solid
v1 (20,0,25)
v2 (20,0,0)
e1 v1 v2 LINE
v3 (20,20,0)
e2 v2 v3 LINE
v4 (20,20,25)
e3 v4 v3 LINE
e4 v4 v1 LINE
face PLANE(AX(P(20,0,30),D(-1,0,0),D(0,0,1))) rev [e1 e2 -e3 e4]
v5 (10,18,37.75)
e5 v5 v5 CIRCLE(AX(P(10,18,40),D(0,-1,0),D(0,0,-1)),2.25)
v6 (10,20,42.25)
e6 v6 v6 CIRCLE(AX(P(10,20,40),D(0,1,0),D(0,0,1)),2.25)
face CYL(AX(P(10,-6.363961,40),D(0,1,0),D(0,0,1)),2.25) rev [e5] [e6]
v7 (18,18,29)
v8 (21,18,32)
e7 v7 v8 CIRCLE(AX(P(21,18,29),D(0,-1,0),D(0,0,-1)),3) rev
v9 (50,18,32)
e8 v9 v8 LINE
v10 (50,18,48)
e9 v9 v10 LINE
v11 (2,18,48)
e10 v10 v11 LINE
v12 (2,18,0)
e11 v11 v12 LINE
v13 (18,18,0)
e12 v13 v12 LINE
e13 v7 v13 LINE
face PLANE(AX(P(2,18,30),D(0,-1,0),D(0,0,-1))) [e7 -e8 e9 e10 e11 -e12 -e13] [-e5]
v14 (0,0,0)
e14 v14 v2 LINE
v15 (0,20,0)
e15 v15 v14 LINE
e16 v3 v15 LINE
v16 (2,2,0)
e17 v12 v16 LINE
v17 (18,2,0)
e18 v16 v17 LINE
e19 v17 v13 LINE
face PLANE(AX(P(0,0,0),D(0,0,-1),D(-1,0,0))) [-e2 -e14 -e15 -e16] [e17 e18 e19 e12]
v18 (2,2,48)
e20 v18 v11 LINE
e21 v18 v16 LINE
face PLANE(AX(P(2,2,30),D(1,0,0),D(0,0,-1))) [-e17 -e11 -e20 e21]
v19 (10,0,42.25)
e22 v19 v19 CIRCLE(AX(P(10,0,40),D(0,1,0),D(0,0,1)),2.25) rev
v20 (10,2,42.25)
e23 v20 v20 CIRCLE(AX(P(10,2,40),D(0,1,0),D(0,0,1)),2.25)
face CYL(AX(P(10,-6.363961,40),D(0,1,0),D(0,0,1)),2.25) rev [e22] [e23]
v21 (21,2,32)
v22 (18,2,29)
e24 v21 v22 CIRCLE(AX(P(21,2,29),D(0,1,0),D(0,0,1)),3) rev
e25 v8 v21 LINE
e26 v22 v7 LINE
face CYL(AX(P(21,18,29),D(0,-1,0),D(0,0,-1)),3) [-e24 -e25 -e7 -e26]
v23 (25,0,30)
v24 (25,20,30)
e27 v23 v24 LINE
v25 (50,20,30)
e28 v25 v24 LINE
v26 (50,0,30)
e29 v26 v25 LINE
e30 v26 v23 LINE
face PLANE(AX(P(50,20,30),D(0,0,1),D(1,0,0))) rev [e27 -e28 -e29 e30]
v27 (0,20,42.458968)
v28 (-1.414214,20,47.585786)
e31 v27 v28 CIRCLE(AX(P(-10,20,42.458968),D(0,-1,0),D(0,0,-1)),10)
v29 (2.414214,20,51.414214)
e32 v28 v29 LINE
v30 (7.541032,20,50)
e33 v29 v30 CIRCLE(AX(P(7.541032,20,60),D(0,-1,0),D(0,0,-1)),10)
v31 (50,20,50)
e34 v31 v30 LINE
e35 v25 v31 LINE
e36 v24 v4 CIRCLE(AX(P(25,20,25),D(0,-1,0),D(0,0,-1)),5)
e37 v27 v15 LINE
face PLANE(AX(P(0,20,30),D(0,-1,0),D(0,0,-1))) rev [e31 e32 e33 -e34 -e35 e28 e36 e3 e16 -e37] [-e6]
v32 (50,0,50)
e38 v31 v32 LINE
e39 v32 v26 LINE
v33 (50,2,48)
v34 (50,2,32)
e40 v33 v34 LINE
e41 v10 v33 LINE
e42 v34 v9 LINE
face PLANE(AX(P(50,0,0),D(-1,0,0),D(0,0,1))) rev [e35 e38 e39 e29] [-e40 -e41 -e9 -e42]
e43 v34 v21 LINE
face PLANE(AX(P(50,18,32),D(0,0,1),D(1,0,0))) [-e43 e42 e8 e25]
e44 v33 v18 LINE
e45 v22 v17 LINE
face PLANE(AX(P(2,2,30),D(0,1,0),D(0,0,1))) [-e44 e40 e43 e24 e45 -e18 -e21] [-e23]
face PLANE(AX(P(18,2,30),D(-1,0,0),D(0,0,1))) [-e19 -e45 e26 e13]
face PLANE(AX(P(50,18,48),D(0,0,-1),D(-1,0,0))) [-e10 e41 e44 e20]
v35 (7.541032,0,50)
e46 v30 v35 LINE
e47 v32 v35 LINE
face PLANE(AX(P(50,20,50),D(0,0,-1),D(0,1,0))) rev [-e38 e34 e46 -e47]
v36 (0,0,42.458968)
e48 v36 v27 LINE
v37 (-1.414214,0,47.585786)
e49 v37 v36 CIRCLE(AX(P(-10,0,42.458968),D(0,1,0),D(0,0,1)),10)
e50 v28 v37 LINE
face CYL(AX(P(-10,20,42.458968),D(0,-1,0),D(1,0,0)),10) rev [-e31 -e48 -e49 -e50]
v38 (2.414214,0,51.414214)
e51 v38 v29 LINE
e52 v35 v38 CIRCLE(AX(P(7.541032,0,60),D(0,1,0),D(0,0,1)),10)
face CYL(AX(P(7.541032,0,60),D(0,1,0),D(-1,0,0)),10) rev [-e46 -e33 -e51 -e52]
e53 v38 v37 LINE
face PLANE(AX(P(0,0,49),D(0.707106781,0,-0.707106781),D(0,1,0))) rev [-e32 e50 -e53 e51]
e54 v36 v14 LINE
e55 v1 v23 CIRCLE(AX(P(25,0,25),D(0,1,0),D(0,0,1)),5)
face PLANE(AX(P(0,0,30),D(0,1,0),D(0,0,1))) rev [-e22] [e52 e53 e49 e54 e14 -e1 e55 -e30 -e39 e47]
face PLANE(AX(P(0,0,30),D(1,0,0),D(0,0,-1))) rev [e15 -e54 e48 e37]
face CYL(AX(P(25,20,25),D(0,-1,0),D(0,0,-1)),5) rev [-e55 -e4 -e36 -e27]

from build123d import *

# Parameters (mm, degrees)
SKETCH1_W                = 20
SKETCH1_H                = 20
SKETCH1_W_2              = 16
SKETCH1_H_2              = 16
BOSS_EXTRUDE1_DEPTH      = 30
BOSS_EXTRUDE2_DEPTH      = 30
BOSS_EXTRUDE2_DEPTH_BACK = 20
SKETCH2_W                = 20
SKETCH2_H                = 20
SKETCH2_W_2              = 16
SKETCH2_H_2              = 16
SKETCH3_W                = 16
SKETCH3_H                = 16
CUT_EXTRUDE1_DEPTH       = 2
SKETCH4_W                = 16
SKETCH4_H                = 16
BOSS_EXTRUDE3_DEPTH      = 2
CHAMFER1_SIZE            = 1
BOSS_EXTRUDE4_REACH      = 83.243
SKETCH5_W                = 2
SKETCH5_H                = 20
BOSS_EXTRUDE6_REACH      = 83.243
SKETCH7_W                = 2
SKETCH7_H                = 20
FILLET1_R                = 10
FILLET2_R                = 3
CUT_EXTRUDE2_REACH       = 76.454
SKETCH8_R                = 2.25
FILLET3_R                = 5


with BuildPart() as part:
    # Sketch1 → Boss-Extrude1 (new body)
    with BuildSketch(Plane.XY):
        with Locations((10, 10)):
            Rectangle(SKETCH1_W, SKETCH1_H)
        with Locations((10, 10)):
            Rectangle(SKETCH1_W_2, SKETCH1_H_2, mode=Mode.SUBTRACT)
    extrude(amount=BOSS_EXTRUDE1_DEPTH)

    # Sketch2 → Boss-Extrude2 (add, two sides: drawn at the far end of the back side and taken through both)
    with BuildSketch(Plane(origin=(20, 0, 0), x_dir=(0, 0, -1), z_dir=(1, 0, 0)).offset(-BOSS_EXTRUDE2_DEPTH_BACK)):
        with Locations((-40, 10)):
            Rectangle(SKETCH2_W, SKETCH2_H)
        with Locations((-40, 10)):
            Rectangle(SKETCH2_W_2, SKETCH2_H_2, mode=Mode.SUBTRACT)
    extrude(amount=BOSS_EXTRUDE2_DEPTH + BOSS_EXTRUDE2_DEPTH_BACK)

    # Sketch3 → Cut-Extrude1 (cut)
    with BuildSketch(Plane(origin=(0, 0, 30), x_dir=(-1, 0, 0), z_dir=(0, 0, -1))):
        with Locations((-10, 10)):
            Rectangle(SKETCH3_W, SKETCH3_H)
    extrude(amount=-CUT_EXTRUDE1_DEPTH, mode=Mode.SUBTRACT)

    # Sketch4 → Boss-Extrude3 (add)
    with BuildSketch(Plane.ZY):
        with Locations((40, 10)):
            Rectangle(SKETCH4_W, SKETCH4_H)
    extrude(amount=-BOSS_EXTRUDE3_DEPTH)

    # Chamfer1
    chamfer1_edges = [part.edges().sort_by_distance(p)[0] for p in [
        (0, 10, 50),
    ]]
    chamfer(chamfer1_edges, length=CHAMFER1_SIZE)

    # Boss-Extrude4: up to this face of the body (flat: up to its plane)
    boss_extrude4_end = Plane(part.part.faces().sort_by_distance((0, 10, 24.5))[0])
    # Sketch5 → Boss-Extrude4 (add, up to the picked face)
    with BuildSketch(Plane(origin=(-24.5, 0, 24.5), x_dir=(0.7071067811865475, 0, 0.7071067811865477), z_dir=(-0.7071067811865477, 0, 0.7071067811865475)), mode=Mode.PRIVATE) as boss_extrude4_sk1:
        with Locations((33.648232278, 10)):
            Rectangle(SKETCH5_W, SKETCH5_H)
    boss_extrude4_tool1 = split(extrude(boss_extrude4_sk1.sketch, amount=-BOSS_EXTRUDE4_REACH, mode=Mode.PRIVATE), bisect_by=boss_extrude4_end, keep=Keep.BOTH, mode=Mode.PRIVATE)
    add(boss_extrude4_tool1.solids().sort_by(Axis((-0.707107, 10, 48.292893), (0.7071067811865477, 0, -0.7071067811865475)))[0])

    # Boss-Extrude6: up to this face of the body (flat: up to its plane)
    boss_extrude6_end = Plane(part.part.faces().sort_by_distance((25.5, 10, 50))[0])
    # Sketch7 → Boss-Extrude6 (add, up to the picked face)
    with BuildSketch(Plane(origin=(-24.5, 0, 24.5), x_dir=(0.7071067811865475, 0, 0.7071067811865477), z_dir=(-0.7071067811865477, 0, 0.7071067811865475)), mode=Mode.PRIVATE) as boss_extrude6_sk1:
        with Locations((37.062445841, 10)):
            Rectangle(SKETCH7_W, SKETCH7_H)
    boss_extrude6_tool1 = split(extrude(boss_extrude6_sk1.sketch, amount=-BOSS_EXTRUDE6_REACH, mode=Mode.PRIVATE), bisect_by=boss_extrude6_end, keep=Keep.BOTH, mode=Mode.PRIVATE)
    add(boss_extrude6_tool1.solids().sort_by(Axis((1.707107, 10, 50.707107), (0.7071067811865477, 0, -0.7071067811865475)))[0])

    # Fillet1
    # the kernel refuses this fillet: 10 mm, written as the material it adds along each edge
    with BuildSketch(Plane(origin=(0, 0, 46.171572875), x_dir=(-0.7071067811878772, 0, 0.7071067811852179), z_dir=(0, 1, 0))) as fillet1_piece_1:
        with BuildLine():
            CenterArc((4.445859456, -9.696276168), FILLET1_R, 104.157365729, 30.842634271)
            Line((-2.625208356, -2.625208356), (-2.766629712, -2.483787))
            Line((-2.766629712, -2.483787), (-0.141421356, 0.141421356))
            Line((-0.141421356, 0.141421356), (0, 0.2))
            ThreePointArc((0, 0.2), (1, 0.2), (1.951082811, 0.193925523))
            Line((1.951082811, 0.193925523), (2, 0))
        make_face()
    extrude(amount=20)
    with BuildSketch(Plane(origin=(3.828427125, 20, 50), x_dir=(1, 0, 0), z_dir=(0, -1, 0))) as fillet1_piece_2:
        with BuildLine():
            CenterArc((3.712605261, 10), FILLET1_R, 239.157365729, 30.842634271)
            Line((-1.414213562, 1.414213562), (-1.516749939, 1.242497834))
            ThreePointArc((-1.516749939, 1.242497834), (-0.848528137, 0.565685425), (-0.141421356, -0.141421356))
            Line((-0.141421356, -0.141421356), (0, -0.2))
            Line((0, -0.2), (3.712605261, -0.2))
            Line((3.712605261, -0.2), (3.712605261, 0))
        make_face()
    extrude(amount=20)

    # Fillet2
    fillet2_edges = [part.edges().sort_by_distance(p)[0] for p in [
        (18, 10, 32),
    ]]
    fillet(fillet2_edges, radius=FILLET2_R)

    # Cut-Extrude2: up to this face of the body (flat: up to its plane)
    cut_extrude2_end = Plane(part.part.faces().sort_by_distance((19.305922938, 0, 30.694077062))[0])
    # Sketch8 → Cut-Extrude2 (cut, up to the picked face)
    with BuildSketch(Plane(origin=(0, 20, 0), x_dir=(1, 0, 0), z_dir=(0, 1, 0)), mode=Mode.PRIVATE) as cut_extrude2_sk1:
        with Locations(Location((10, -40, 0), (0, 0, 270))):
            Circle(SKETCH8_R)
    cut_extrude2_tool1 = split(extrude(cut_extrude2_sk1.sketch, amount=-CUT_EXTRUDE2_REACH, mode=Mode.PRIVATE), bisect_by=cut_extrude2_end, keep=Keep.BOTH, mode=Mode.PRIVATE)
    add(cut_extrude2_tool1.solids().sort_by(Axis((10, 20, 40), (0, -1, 0)))[0], mode=Mode.SUBTRACT)

    # Fillet3
    fillet3_edges = [part.edges().sort_by_distance(p)[0] for p in [
        (20, 10, 30),
    ]]
    fillet(fillet3_edges, radius=FILLET3_R)


solid = part.part
